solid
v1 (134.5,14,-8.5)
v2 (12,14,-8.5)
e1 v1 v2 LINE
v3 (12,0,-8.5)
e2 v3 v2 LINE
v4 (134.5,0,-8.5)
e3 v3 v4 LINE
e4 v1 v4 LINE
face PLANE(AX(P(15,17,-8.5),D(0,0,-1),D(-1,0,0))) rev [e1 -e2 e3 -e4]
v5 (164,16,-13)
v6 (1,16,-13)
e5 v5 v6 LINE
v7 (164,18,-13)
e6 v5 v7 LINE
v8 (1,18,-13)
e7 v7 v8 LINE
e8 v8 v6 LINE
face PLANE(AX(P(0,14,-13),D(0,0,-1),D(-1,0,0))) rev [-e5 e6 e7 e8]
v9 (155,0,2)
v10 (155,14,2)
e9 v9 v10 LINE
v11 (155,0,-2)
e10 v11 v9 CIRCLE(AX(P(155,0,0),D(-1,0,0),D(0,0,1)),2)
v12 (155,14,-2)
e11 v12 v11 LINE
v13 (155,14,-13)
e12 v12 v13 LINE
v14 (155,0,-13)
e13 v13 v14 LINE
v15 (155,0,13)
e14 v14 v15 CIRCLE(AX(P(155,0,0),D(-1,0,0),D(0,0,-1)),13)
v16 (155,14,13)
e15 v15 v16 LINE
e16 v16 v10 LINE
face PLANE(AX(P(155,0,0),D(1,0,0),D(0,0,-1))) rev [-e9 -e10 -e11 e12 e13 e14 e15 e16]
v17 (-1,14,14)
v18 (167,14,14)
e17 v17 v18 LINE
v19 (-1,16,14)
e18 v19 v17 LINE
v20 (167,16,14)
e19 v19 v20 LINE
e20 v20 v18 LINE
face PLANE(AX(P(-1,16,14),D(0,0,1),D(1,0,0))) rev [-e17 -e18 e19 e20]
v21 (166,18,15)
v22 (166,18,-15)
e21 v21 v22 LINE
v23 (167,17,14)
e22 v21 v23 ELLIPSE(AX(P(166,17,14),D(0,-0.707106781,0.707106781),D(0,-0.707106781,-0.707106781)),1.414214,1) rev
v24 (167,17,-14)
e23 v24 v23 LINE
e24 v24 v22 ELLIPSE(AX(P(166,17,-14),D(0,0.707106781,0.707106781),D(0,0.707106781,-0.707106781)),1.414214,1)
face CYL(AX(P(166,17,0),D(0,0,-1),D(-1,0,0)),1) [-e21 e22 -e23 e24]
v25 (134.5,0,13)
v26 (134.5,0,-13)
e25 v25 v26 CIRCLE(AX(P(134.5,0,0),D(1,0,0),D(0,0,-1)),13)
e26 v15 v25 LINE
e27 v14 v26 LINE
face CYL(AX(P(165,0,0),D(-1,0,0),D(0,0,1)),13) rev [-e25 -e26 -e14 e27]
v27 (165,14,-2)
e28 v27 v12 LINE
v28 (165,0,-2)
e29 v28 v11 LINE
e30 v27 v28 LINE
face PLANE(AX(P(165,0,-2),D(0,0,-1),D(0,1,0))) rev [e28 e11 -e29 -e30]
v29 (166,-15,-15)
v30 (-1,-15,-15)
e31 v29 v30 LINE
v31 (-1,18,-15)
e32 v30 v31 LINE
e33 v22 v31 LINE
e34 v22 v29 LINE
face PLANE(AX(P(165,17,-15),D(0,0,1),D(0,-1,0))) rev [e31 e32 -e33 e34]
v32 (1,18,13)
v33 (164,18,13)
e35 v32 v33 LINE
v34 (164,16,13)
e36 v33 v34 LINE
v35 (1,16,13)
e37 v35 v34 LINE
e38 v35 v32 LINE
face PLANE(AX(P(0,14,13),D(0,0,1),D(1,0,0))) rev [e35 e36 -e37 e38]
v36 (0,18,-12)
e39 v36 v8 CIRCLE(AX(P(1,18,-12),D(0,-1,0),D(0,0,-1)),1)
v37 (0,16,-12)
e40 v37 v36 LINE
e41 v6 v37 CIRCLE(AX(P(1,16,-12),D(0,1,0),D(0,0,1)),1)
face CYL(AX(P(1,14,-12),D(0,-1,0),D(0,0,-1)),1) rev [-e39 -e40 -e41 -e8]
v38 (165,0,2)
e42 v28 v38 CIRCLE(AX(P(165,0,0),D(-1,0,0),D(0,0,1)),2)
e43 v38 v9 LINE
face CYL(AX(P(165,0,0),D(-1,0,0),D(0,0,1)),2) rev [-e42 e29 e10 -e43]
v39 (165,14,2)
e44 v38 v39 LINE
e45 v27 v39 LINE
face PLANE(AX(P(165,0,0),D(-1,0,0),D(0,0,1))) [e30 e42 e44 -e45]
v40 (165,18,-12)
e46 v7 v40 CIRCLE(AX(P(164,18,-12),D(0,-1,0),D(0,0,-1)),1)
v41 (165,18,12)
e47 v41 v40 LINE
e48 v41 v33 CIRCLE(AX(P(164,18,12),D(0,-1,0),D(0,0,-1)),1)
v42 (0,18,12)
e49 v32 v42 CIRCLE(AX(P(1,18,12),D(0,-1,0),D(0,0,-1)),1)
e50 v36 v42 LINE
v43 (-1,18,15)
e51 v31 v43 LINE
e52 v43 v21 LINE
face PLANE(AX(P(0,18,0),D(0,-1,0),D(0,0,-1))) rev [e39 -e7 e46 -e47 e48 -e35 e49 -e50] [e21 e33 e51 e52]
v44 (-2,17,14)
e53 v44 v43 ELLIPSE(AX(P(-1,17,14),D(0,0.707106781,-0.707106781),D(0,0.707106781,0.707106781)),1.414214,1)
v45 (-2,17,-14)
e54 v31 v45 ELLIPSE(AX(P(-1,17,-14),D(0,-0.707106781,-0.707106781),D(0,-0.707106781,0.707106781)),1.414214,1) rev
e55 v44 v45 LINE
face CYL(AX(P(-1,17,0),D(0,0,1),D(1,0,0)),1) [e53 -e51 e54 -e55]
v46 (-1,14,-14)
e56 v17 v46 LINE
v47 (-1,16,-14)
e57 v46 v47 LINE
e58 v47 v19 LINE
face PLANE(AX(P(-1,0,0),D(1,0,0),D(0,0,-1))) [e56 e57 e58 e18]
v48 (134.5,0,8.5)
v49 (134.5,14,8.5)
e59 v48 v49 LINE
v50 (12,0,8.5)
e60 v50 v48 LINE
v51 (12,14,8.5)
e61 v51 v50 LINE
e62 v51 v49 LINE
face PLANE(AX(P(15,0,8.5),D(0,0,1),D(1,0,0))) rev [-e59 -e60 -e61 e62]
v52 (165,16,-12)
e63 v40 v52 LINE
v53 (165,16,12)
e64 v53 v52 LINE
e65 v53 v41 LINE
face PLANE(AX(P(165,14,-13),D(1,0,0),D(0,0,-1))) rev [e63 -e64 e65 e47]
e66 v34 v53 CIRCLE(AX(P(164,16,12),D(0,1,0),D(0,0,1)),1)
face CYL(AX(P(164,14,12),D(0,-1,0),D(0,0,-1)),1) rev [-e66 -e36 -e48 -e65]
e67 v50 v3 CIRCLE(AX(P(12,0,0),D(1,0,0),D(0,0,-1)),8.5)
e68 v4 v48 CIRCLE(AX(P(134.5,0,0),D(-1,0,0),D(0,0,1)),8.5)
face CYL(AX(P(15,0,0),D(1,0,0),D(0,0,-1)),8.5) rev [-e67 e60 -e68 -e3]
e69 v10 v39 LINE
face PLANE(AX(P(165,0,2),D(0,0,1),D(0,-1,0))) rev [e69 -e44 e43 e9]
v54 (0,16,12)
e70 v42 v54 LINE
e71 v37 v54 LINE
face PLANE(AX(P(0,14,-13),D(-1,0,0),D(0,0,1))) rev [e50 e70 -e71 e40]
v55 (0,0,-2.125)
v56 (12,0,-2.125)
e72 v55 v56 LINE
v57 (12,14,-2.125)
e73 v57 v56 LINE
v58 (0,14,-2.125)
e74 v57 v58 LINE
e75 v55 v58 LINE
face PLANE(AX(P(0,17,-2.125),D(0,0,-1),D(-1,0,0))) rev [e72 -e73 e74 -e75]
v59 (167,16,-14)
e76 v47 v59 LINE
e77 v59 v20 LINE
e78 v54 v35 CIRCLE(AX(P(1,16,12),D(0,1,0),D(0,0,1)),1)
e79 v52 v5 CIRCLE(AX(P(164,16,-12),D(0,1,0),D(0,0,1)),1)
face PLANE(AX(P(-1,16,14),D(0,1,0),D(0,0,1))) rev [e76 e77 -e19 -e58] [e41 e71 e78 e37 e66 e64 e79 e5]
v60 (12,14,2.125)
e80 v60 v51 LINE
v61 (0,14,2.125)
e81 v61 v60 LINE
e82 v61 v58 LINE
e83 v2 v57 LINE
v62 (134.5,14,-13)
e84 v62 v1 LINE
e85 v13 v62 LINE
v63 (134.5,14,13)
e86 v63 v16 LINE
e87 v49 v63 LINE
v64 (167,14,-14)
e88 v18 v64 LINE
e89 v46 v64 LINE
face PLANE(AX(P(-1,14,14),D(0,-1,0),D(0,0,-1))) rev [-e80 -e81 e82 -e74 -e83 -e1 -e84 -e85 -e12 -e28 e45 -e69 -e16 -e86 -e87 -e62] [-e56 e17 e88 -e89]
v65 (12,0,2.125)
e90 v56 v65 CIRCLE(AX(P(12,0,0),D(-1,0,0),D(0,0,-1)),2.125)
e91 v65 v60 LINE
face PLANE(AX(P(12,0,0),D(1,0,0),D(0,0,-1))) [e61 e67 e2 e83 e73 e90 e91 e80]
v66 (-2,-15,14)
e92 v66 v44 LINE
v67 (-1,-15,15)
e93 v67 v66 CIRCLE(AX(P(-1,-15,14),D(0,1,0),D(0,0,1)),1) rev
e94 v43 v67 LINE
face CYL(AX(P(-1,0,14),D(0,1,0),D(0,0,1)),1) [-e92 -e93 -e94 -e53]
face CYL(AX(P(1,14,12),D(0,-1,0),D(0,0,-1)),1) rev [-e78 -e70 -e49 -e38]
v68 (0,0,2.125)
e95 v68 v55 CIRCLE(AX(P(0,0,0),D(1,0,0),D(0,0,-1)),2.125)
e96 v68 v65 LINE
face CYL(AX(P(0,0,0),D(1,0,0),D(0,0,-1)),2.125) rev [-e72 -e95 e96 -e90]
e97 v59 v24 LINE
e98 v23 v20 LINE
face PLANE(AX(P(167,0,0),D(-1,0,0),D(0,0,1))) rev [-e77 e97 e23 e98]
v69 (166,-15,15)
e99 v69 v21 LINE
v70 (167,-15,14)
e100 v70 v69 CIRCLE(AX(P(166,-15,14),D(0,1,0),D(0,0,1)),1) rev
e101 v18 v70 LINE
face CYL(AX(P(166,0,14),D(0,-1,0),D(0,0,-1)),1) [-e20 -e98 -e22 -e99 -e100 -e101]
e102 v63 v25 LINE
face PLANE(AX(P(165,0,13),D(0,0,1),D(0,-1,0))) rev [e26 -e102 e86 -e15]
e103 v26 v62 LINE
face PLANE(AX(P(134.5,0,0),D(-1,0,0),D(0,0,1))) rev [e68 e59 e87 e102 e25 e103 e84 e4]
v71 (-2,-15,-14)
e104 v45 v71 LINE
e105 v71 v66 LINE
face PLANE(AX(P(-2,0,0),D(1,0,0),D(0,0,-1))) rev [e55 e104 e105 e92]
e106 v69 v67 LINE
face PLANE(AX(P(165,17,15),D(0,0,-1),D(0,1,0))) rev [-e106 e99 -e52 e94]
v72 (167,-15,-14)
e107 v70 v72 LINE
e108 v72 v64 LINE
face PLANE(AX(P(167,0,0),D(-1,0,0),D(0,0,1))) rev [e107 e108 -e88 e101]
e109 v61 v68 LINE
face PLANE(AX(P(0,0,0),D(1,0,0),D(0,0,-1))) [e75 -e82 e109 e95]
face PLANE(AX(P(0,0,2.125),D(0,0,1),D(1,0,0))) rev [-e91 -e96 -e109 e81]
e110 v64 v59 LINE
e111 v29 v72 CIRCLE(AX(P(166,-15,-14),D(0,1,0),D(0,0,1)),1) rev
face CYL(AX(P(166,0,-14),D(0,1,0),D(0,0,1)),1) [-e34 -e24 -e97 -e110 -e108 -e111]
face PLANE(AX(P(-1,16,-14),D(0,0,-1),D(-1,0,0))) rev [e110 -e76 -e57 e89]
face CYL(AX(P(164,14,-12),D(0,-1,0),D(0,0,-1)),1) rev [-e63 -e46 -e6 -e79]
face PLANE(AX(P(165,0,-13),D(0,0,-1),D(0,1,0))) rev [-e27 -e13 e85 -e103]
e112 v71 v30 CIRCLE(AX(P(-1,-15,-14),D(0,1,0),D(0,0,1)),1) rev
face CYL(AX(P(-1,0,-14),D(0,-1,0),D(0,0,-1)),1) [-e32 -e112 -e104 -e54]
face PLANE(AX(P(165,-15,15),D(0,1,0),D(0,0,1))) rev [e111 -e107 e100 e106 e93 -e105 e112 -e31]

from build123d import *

# Parameters (mm, degrees)
BOSS_EXTRUDE1_DEPTH = 165
SKETCH3_W           = 30
SKETCH3_H           = 32
BOSS_EXTRUDE2_DEPTH = 2
SKETCH4_W           = 30
SKETCH4_H           = 32
BOSS_EXTRUDE3_DEPTH = 2
BOSS_EXTRUDE4_START = 10
BOSS_EXTRUDE4_DEPTH = 10
CUT_EXTRUDE1_DEPTH  = 10
BOSS_EXTRUDE6_DEPTH = 15
CUT_EXTRUDE2_DEPTH  = 15
BOSS_EXTRUDE7_DEPTH = 121
CUT_EXTRUDE3_DEPTH  = 121
SKETCH13_W          = 169
SKETCH13_H          = 30
CUT_EXTRUDE5_DEPTH  = 3
SKETCH14_W          = 169
SKETCH14_H          = 30
BOSS_EXTRUDE8_DEPTH = 3
SKETCH12_W          = 28
SKETCH12_H          = 2
CUT_EXTRUDE6_DEPTH  = 168
SKETCH16_W          = 165
SKETCH16_H          = 26
CUT_EXTRUDE7_DEPTH  = 3
CUT_EXTRUDE8_DEPTH  = 1.5
CUT_EXTRUDE9_DEPTH  = 3
SKETCH20_W          = 169
SKETCH20_H          = 30
BOSS_EXTRUDE9_DEPTH = 1
SKETCH21_W          = 165
SKETCH21_H          = 26
CUT_EXTRUDE10_DEPTH = 1
FILLET1_START       = -16
FILLET1_DEPTH       = 35
FILLET1_2_DEPTH     = 32
FILLET2_R           = 1


with BuildPart() as part:
    # Sketch2 → Boss-Extrude1 (new body)
    with BuildSketch(Plane(origin=(0, 0, 0), x_dir=(0, 0, -1), z_dir=(1, 0, 0))):
        with BuildLine():
            Line((-13, 0), (-13, 17))
            Line((-13, 17), (-15, 17))
            Line((-15, 17), (-15, -15))
            Line((-15, -15), (15, -15))
            Line((15, -15), (15, 17))
            Line((15, 17), (13, 17))
            Line((13, 17), (13, 0))
            ThreePointArc((13, 0), (0, -13), (-13, 0))
        make_face()
    extrude(amount=BOSS_EXTRUDE1_DEPTH)

    # Sketch3 → Boss-Extrude2 (add)
    with BuildSketch(Plane(origin=(165, 0, 0), x_dir=(0, 0, -1), z_dir=(1, 0, 0))):
        with Locations((0, 1)):
            Rectangle(SKETCH3_W, SKETCH3_H)
    extrude(amount=BOSS_EXTRUDE2_DEPTH)

    # Sketch4 → Boss-Extrude3 (add)
    with BuildSketch(Plane.ZY):
        with Locations((0, 1)):
            Rectangle(SKETCH4_W, SKETCH4_H)
    extrude(amount=BOSS_EXTRUDE3_DEPTH)

    # Sketch5 → Boss-Extrude4 (add)
    with BuildSketch(Plane.ZY.offset(-165).offset(BOSS_EXTRUDE4_START)):
        with BuildLine():
            Line((-13, 17), (-13, 0))
            ThreePointArc((-13, 0), (0, -13), (13, 0))
            Line((13, 0), (13, 17))
            Line((13, 17), (-13, 17))
        make_face()
    extrude(amount=-BOSS_EXTRUDE4_DEPTH)

    # Sketch6 → Cut-Extrude1 (cut)
    with BuildSketch(Plane.ZY.offset(-155)):
        with BuildLine():
            Line((-2, 0), (-2, 17))
            Line((-2, 17), (2, 17))
            Line((2, 17), (2, 0))
            ThreePointArc((2, 0), (0, -2), (-2, 0))
        make_face()
    extrude(amount=-CUT_EXTRUDE1_DEPTH, mode=Mode.SUBTRACT)

    # Sketch8 → Boss-Extrude6 (add)
    with BuildSketch(Plane(origin=(0, 0, 0), x_dir=(0, 0, -1), z_dir=(1, 0, 0))):
        with BuildLine():
            Line((13, 0), (13, 17))
            Line((13, 17), (-13, 17))
            Line((-13, 17), (-13, 0))
            ThreePointArc((-13, 0), (0, -13), (13, 0))
        make_face()
    extrude(amount=BOSS_EXTRUDE6_DEPTH)

    # Sketch9 → Cut-Extrude2 (cut)
    with BuildSketch(Plane(origin=(15, 0, 0), x_dir=(0, 0, -1), z_dir=(1, 0, 0))):
        with BuildLine():
            Line((-2.125, 0), (-2.125, 17))
            Line((-2.125, 17), (2.125, 17))
            Line((2.125, 17), (2.125, 0))
            ThreePointArc((2.125, 0), (0, -2.125), (-2.125, 0))
        make_face()
    extrude(amount=-CUT_EXTRUDE2_DEPTH, mode=Mode.SUBTRACT)

    # Sketch10 → Boss-Extrude7 (add)
    with BuildSketch(Plane(origin=(15, 0, 0), x_dir=(0, 0, -1), z_dir=(1, 0, 0))):
        with BuildLine():
            Line((13, 0), (13, 17))
            Line((13, 17), (-13, 17))
            Line((-13, 17), (-13, 0))
            ThreePointArc((-13, 0), (0, -13), (13, 0))
        make_face()
    extrude(amount=BOSS_EXTRUDE7_DEPTH)

    # Sketch11 → Cut-Extrude3 (cut)
    with BuildSketch(Plane(origin=(136, 0, 0), x_dir=(0, 0, -1), z_dir=(1, 0, 0))):
        with BuildLine():
            Line((-8.5, 0), (-8.5, 17))
            Line((-8.5, 17), (8.5, 17))
            Line((8.5, 17), (8.5, 0))
            ThreePointArc((8.5, 0), (0, -8.5), (-8.5, 0))
        make_face()
    extrude(amount=-CUT_EXTRUDE3_DEPTH, mode=Mode.SUBTRACT)

    # Sketch13 → Cut-Extrude5 (cut)
    with BuildSketch(Plane(origin=(0, 17, 0), x_dir=(1, 0, 0), z_dir=(0, 1, 0))):
        with Locations((82.5, 0)):
            Rectangle(SKETCH13_W, SKETCH13_H)
    extrude(amount=-CUT_EXTRUDE5_DEPTH, mode=Mode.SUBTRACT)

    # Sketch14 → Boss-Extrude8 (add)
    with BuildSketch(Plane(origin=(0, 14, 0), x_dir=(1, 0, 0), z_dir=(0, 1, 0))):
        with Locations((82.5, 0)):
            Rectangle(SKETCH14_W, SKETCH14_H)
    extrude(amount=BOSS_EXTRUDE8_DEPTH)

    # Sketch12 → Cut-Extrude6 (cut)
    with BuildSketch(Plane(origin=(167, 0, 0), x_dir=(0, 0, -1), z_dir=(1, 0, 0))):
        with Locations((0, 15)):
            Rectangle(SKETCH12_W, SKETCH12_H)
    extrude(amount=-CUT_EXTRUDE6_DEPTH, mode=Mode.SUBTRACT)

    # Sketch16 → Cut-Extrude7 (cut)
    with BuildSketch(Plane(origin=(0, 17, 0), x_dir=(1, 0, 0), z_dir=(0, 1, 0))):
        with Locations((82.5, 0)):
            Rectangle(SKETCH16_W, SKETCH16_H)
    extrude(amount=-CUT_EXTRUDE7_DEPTH, mode=Mode.SUBTRACT)

    # Sketch17 → Cut-Extrude8 (cut)
    with BuildSketch(Plane(origin=(136, 0, 0), x_dir=(0, 0, -1), z_dir=(1, 0, 0))):
        with BuildLine():
            Line((13, 14), (13, 0))
            ThreePointArc((13, 0), (0, -13), (-13, 0))
            Line((-13, 0), (-13, 14))
            Line((-13, 14), (-8.5, 14))
            Line((-8.5, 14), (-8.5, 0))
            ThreePointArc((-8.5, 0), (0, -8.5), (8.5, 0))
            Line((8.5, 0), (8.5, 14))
            Line((8.5, 14), (13, 14))
        make_face()
    extrude(amount=-CUT_EXTRUDE8_DEPTH, mode=Mode.SUBTRACT)

    # Sketch18 → Cut-Extrude9 (cut)
    with BuildSketch(Plane(origin=(15, 0, 0), x_dir=(0, 0, -1), z_dir=(1, 0, 0))):
        with BuildLine():
            Line((8.5, 0), (8.5, 14))
            Line((8.5, 14), (2.125, 14))
            Line((2.125, 14), (2.125, 0))
            ThreePointArc((2.125, 0), (0, -2.125), (-2.125, 0))
            Line((-2.125, 0), (-2.125, 14))
            Line((-2.125, 14), (-8.5, 14))
            Line((-8.5, 14), (-8.5, 0))
            ThreePointArc((-8.5, 0), (0, -8.5), (8.5, 0))
        make_face()
    extrude(amount=-CUT_EXTRUDE9_DEPTH, mode=Mode.SUBTRACT)

    # Sketch20 → Boss-Extrude9 (add)
    with BuildSketch(Plane(origin=(0, 17, 0), x_dir=(1, 0, 0), z_dir=(0, 1, 0))):
        with Locations((82.5, 0)):
            Rectangle(SKETCH20_W, SKETCH20_H)
    extrude(amount=BOSS_EXTRUDE9_DEPTH)

    # Sketch21 → Cut-Extrude10 (cut)
    with BuildSketch(Plane(origin=(0, 18, 0), x_dir=(1, 0, 0), z_dir=(0, 1, 0))):
        with Locations((82.5, 0)):
            Rectangle(SKETCH21_W, SKETCH21_H)
    extrude(amount=-CUT_EXTRUDE10_DEPTH, mode=Mode.SUBTRACT)

    # Fillet1: read off the stored shape, not the designer's step
    # Fillet1 outline → Fillet1 (cut)
    with BuildSketch(Plane(origin=(0, 0, 0), x_dir=(1, 0, 0), z_dir=(0, 1, 0)).offset(FILLET1_START)):
        with BuildLine():
            Line((-2, 15), (-2, 14))
            ThreePointArc((-2, 14), (-1.707106781, 14.707106781), (-1, 15))
            Line((-1, 15), (-2, 15))
        make_face()
        with BuildLine():
            ThreePointArc((-1, -15), (-1.707106781, -14.707106781), (-2, -14))
            Line((-2, -14), (-2, -15))
            Line((-2, -15), (-1, -15))
        make_face()
        with BuildLine():
            Line((167, 15), (166, 15))
            ThreePointArc((166, 15), (166.707106781, 14.707106781), (167, 14))
            Line((167, 14), (167, 15))
        make_face()
        with BuildLine():
            ThreePointArc((167, -14), (166.707106781, -14.707106781), (166, -15))
            Line((166, -15), (167, -15))
            Line((167, -15), (167, -14))
        make_face()
    extrude(amount=FILLET1_DEPTH, mode=Mode.SUBTRACT)

    # Fillet1 2 outline → Fillet1 2 (cut)
    with BuildSketch(Plane.XY.offset(FILLET1_START)):
        with BuildLine():
            Line((167, 18), (166, 18))
            ThreePointArc((166, 18), (166.707106781, 17.707106781), (167, 17))
            Line((167, 17), (167, 18))
        make_face()
        with BuildLine():
            ThreePointArc((-2, 17), (-1.707106781, 17.707106781), (-1, 18))
            Line((-1, 18), (-2, 18))
            Line((-2, 18), (-2, 17))
        make_face()
    extrude(amount=FILLET1_2_DEPTH, mode=Mode.SUBTRACT)

    # Fillet2
    fillet2_edges = [part.edges().sort_by_distance(p)[0] for p in [
        (0, 17, 13),
        (0, 17, -13),
        (165, 17, -13),
        (165, 17, 13),
    ]]
    fillet(fillet2_edges, radius=FILLET2_R)


solid = part.part
